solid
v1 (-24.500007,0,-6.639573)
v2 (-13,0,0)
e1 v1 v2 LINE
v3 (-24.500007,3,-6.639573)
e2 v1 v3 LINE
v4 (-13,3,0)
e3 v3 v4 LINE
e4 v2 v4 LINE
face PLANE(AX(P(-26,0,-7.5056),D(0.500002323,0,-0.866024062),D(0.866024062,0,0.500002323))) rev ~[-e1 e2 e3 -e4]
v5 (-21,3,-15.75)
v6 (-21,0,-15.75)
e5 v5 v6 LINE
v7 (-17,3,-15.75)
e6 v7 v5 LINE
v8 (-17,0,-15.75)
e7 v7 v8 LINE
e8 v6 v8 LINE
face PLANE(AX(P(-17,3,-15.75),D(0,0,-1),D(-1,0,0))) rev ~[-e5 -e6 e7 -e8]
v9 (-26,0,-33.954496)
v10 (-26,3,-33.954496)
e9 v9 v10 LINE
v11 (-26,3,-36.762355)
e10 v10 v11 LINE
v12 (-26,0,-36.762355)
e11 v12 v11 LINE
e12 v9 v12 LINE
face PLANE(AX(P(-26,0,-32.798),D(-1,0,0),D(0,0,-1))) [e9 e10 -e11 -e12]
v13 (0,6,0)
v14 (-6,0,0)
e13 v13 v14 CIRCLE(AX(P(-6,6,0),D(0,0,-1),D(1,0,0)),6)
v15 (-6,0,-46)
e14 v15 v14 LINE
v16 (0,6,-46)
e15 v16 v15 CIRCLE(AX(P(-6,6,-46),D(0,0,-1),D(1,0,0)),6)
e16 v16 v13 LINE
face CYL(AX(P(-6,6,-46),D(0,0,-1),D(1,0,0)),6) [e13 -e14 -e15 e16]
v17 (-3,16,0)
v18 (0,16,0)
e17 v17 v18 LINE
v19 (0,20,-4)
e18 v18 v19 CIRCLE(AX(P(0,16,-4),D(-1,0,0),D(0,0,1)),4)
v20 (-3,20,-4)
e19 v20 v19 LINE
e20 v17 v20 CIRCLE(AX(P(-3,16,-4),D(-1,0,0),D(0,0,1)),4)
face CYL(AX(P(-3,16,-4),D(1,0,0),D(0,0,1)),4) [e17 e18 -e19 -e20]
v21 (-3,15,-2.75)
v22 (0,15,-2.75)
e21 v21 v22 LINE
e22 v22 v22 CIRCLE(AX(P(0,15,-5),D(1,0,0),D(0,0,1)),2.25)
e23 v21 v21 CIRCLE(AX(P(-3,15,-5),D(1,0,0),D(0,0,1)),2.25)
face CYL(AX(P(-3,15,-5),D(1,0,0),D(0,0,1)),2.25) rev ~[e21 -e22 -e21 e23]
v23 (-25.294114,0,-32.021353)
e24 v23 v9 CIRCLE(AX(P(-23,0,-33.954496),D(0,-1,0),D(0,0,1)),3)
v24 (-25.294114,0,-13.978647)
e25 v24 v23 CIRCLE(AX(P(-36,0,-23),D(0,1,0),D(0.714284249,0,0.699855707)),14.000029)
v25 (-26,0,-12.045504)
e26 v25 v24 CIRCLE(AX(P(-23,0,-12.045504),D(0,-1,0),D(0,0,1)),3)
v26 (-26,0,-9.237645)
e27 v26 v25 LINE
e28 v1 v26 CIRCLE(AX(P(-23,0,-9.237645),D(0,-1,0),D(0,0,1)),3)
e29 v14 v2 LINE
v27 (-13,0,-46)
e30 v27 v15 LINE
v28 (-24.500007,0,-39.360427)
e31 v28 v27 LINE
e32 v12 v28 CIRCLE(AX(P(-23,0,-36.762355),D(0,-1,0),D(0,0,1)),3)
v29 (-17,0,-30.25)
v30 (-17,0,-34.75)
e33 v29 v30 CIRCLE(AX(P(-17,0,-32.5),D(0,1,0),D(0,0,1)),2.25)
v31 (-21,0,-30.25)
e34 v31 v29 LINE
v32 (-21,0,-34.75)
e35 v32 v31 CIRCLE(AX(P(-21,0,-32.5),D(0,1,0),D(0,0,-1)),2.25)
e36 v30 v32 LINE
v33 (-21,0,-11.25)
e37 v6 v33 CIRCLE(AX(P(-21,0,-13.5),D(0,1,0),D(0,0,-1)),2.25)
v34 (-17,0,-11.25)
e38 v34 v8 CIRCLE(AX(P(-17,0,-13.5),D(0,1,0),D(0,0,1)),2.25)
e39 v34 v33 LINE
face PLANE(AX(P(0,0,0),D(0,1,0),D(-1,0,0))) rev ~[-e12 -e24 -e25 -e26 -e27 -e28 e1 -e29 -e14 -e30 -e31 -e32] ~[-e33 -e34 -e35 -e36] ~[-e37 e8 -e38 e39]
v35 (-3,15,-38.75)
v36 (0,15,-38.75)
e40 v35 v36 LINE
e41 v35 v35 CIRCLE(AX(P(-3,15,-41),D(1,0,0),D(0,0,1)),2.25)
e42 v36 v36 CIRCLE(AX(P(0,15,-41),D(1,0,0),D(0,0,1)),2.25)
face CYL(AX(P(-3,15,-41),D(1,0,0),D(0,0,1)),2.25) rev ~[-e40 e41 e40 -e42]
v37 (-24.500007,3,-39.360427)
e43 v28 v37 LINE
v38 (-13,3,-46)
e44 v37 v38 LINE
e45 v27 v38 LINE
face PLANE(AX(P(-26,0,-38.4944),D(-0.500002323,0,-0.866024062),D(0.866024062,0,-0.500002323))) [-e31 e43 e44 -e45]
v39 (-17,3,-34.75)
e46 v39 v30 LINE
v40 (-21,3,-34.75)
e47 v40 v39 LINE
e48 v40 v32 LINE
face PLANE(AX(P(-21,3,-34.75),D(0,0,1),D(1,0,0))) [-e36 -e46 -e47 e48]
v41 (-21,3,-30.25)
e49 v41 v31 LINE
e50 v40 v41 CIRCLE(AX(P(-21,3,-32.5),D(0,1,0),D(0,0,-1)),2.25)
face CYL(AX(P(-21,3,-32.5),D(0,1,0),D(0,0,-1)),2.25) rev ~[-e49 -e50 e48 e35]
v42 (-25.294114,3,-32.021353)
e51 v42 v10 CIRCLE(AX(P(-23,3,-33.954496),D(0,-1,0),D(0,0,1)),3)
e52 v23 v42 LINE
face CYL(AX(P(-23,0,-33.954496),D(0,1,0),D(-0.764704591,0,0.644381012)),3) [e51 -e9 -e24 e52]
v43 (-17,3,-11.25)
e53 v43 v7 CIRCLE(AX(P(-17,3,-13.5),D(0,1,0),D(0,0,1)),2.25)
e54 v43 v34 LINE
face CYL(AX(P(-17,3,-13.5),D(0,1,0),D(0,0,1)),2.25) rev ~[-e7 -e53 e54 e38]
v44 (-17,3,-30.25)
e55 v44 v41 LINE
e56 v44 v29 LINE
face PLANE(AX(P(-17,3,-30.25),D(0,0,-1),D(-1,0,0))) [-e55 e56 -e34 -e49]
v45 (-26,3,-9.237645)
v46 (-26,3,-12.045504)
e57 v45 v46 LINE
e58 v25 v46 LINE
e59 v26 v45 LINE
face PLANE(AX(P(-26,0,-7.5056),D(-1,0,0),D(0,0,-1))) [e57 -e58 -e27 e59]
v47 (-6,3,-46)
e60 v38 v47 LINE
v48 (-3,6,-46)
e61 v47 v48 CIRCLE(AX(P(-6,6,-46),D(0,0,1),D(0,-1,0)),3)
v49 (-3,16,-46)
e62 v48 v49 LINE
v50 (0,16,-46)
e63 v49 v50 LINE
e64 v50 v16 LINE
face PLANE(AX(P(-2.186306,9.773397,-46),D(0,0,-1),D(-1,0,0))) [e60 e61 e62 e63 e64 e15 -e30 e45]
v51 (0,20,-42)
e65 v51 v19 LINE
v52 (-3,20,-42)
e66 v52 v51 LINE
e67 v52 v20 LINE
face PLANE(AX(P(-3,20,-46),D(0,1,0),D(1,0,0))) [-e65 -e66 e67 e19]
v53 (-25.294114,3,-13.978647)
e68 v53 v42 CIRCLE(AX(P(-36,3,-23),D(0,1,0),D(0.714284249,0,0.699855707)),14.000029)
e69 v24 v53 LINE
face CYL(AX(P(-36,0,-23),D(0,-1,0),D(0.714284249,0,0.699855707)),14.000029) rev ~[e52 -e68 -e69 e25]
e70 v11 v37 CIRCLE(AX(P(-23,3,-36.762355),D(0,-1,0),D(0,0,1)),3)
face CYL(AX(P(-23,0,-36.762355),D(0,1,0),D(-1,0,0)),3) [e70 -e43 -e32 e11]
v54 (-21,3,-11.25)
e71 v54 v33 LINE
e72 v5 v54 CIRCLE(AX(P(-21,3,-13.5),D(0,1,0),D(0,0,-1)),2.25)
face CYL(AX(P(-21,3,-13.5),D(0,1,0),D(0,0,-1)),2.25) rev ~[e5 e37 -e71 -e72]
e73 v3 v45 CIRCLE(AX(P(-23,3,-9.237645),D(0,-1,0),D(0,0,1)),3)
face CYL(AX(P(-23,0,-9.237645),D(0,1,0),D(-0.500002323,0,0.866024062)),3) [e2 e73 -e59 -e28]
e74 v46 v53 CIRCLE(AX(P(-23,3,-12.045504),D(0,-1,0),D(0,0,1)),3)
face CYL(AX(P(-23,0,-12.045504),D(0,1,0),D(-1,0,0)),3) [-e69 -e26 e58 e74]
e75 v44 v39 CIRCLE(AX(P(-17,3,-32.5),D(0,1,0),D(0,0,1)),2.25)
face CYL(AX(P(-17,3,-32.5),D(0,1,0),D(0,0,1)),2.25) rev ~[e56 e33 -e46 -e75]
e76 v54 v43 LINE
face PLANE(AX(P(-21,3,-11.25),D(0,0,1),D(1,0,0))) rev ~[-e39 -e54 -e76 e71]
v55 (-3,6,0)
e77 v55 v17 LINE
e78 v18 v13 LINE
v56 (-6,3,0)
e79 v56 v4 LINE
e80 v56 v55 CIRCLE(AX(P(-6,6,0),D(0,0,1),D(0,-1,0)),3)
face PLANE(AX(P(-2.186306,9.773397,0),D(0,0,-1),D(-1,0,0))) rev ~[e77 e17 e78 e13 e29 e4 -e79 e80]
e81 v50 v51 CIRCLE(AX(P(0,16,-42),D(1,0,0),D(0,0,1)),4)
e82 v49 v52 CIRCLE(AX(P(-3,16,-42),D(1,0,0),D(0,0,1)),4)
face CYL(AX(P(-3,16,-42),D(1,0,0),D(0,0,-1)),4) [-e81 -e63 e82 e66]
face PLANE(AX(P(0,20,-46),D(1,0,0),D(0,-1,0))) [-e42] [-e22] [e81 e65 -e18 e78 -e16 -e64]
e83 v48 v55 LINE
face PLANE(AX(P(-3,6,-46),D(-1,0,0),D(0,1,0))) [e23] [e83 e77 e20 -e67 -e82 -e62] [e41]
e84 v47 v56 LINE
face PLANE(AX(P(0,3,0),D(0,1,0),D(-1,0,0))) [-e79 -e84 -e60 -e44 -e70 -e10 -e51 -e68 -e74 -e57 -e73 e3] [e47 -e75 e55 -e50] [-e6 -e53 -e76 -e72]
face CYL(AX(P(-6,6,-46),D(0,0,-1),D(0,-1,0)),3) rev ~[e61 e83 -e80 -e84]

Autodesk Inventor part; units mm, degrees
ref_plane "YZ Plane" through (0, 0, 0) normal (1, 0, 0) x (0, 1, 0)
ref_plane "XZ Plane" through (0, 0, 0) normal (0, 1, 0) x (-1, 0, 0)
ref_plane "XY Plane" through (0, 0, 0) normal (0, 0, 1) x (1, 0, 0)
sketch "Náčrt1" plane through (0, 0, 0) normal (0, 1, 0) x (-1, 0, 0)
  line L0 (0, 0) -> (26, 0)
  line L1 (13, -46) -> (0, -46)
  line L2 (0, -46) -> (0, 0)
  line L3 (26, -7.5056) -> (13, 0)
  line L4 (35.4765, -23) -> (0, -23) construction
  arc A0 (26, -13.202) -> (26, -32.798) centre (36, -23) ccw
  line L5 (26, -38.4944) -> (13, -46)
  line L6 (26, -7.5056) -> (26, -13.202)
  line L7 (26, -32.798) -> (26, -38.4944)
  point P0 (13, 0)
  dimension "d15" = -30
  dimension "d17" = 28
  dimension "d18" = 36
  dimension "d19" = 26
  dimension "d20" = 13
  dimension "d21" = 46
  dimension "d22" = 7.5056
extrude "Deska1" add sketch "Náčrt1" along normal blind 3
sketch "Náčrt2" plane through (-3, 0, -46) normal (1, 0, 0) x (0, 1, 0)
  line L0 (0, 46) -> (0, 0)
  line L1 (0, 0) -> (20, 0)
  line L2 (20, 0) -> (20, 46)
  line L3 (20, 46) -> (0, 46)
edge flange "Obruba1" height 20 angle 90 thickness 3 bend radius 3 thickness toward (1, 0, 0) relief tear relief width 3 relief depth 1.5 edges at (0, 3, -23) wall of the first edge with corners at (-3, 0, 0) (-3, 0, -46) (-3, 20, -46) (-3, 20, 0)
bend "Ohyb1"
corner "Roh1"
fillet "Zaoblení rohu1" radius 3 4 edges at (-26, 1.5, -7.5056) (-26, 1.5, -38.4944) (-26, 1.5, -13.202) (-26, 1.5, -32.798)
fillet "Zaoblení rohu2" radius 4 2 edges at (-1.5, 20, -46) (-1.5, 20, 0)
sketch "Náčrt3" plane through (-3, 6, -46) normal (-1, 0, 0) x (0, 0, 1)
  line L0 (42, 14) -> (4, 14) projected
  line L1 (23, 14) -> (23, 0) construction
  line L2 (46, 0) -> (0, 0) construction
  line L3 (0, -6) -> (46, -6) construction
  point P0 (41, 9)
  point P1 (5, 9)
  dimension "d25" = 36
  dimension "d26" = 15
hole "Díra1" at (-3, 15, -5) at (-3, 15, -41) direction (1, 0, 0) diameter 4.5 end through all
sketch "Náčrt4" plane through (0, 3, 0) normal (0, 1, 0) x (1, 0, 0)
  line L0 (-21, 13.5) -> (-17, 13.5) construction
  line L1 (-21, 11.25) -> (-17, 11.25)
  line L2 (-17, 15.75) -> (-21, 15.75)
  arc A0 (-21, 15.75) -> (-21, 11.25) centre (-21, 13.5) ccw
  arc A1 (-17, 11.25) -> (-17, 15.75) centre (-17, 13.5) ccw
  arc A2 (-26, 13.202) -> (-26, 32.798) centre (-36, 23) ccw projected
  line L3 (-22, 23) -> (-6, 23) construction
  line L4 (-6, 0) -> (-6, 46) construction
  line L5 (-21, 32.5) -> (-17, 32.5) construction
  line L6 (-21, 34.75) -> (-17, 34.75)
  line L7 (-17, 30.25) -> (-21, 30.25)
  arc A3 (-21, 34.75) -> (-21, 30.25) centre (-21, 32.5) ccw
  arc A4 (-17, 30.25) -> (-17, 34.75) centre (-17, 32.5) ccw
  line L8 (-6, 0) -> (-13, 0) construction
  line L9 (-26, 9.2376) -> (-26, 13.202) construction
  point P0 (0, 0)
  point P1 (-19, 13.5)
  point P2 (-19, 32.5)
  point P3 (-19, 32.5)
  dimension "d36" = 4
  dimension "d37" = 4.5
  dimension "d40" = 19
  dimension "d41" = 5
extrude "Vysunutí1" cut sketch "Náčrt4" against normal up to next
equation "\"d32\" = Tloušťka"
equation "\"d3\" = Tloušťka"
equation "\"d4\" = ŠířkaVýštipu"
equation "\"d5\" = HloubkaVýštipu"
equation "\"d6\" = MinimálníZbytek"
equation "\"d7\" = PřechodovýPoloměr"
equation "\"d10\" = PoloměrOhybu"
equation "\"d11\" = VelikostRohovéhoVýštipu"
equation "\"d12\" = VelikostMezery"
equation "\"d13\" = VelikostJacobihoPoloměru"
equation "\"PoloměrOhybu\" = Tloušťka"
equation "\"ŠířkaVýštipu\" = Tloušťka"
equation "\"HloubkaVýštipu\" = 0.5 * Tloušťka"
equation "\"VelikostRohovéhoVýštipu\" = 4 * Tloušťka"
equation "\"MinimálníZbytek\" = 2 * Tloušťka"
equation "\"PřechodovýPoloměr\" = PoloměrOhybu"
equation "\"VelikostJacobihoPoloměru\" = PoloměrOhybu"
equation "\"VelikostMezery\" = Tloušťka"
equation "\"Tloušťka\" = 3"
properties part number "drzak_valce2" material "Železo, kujné"
